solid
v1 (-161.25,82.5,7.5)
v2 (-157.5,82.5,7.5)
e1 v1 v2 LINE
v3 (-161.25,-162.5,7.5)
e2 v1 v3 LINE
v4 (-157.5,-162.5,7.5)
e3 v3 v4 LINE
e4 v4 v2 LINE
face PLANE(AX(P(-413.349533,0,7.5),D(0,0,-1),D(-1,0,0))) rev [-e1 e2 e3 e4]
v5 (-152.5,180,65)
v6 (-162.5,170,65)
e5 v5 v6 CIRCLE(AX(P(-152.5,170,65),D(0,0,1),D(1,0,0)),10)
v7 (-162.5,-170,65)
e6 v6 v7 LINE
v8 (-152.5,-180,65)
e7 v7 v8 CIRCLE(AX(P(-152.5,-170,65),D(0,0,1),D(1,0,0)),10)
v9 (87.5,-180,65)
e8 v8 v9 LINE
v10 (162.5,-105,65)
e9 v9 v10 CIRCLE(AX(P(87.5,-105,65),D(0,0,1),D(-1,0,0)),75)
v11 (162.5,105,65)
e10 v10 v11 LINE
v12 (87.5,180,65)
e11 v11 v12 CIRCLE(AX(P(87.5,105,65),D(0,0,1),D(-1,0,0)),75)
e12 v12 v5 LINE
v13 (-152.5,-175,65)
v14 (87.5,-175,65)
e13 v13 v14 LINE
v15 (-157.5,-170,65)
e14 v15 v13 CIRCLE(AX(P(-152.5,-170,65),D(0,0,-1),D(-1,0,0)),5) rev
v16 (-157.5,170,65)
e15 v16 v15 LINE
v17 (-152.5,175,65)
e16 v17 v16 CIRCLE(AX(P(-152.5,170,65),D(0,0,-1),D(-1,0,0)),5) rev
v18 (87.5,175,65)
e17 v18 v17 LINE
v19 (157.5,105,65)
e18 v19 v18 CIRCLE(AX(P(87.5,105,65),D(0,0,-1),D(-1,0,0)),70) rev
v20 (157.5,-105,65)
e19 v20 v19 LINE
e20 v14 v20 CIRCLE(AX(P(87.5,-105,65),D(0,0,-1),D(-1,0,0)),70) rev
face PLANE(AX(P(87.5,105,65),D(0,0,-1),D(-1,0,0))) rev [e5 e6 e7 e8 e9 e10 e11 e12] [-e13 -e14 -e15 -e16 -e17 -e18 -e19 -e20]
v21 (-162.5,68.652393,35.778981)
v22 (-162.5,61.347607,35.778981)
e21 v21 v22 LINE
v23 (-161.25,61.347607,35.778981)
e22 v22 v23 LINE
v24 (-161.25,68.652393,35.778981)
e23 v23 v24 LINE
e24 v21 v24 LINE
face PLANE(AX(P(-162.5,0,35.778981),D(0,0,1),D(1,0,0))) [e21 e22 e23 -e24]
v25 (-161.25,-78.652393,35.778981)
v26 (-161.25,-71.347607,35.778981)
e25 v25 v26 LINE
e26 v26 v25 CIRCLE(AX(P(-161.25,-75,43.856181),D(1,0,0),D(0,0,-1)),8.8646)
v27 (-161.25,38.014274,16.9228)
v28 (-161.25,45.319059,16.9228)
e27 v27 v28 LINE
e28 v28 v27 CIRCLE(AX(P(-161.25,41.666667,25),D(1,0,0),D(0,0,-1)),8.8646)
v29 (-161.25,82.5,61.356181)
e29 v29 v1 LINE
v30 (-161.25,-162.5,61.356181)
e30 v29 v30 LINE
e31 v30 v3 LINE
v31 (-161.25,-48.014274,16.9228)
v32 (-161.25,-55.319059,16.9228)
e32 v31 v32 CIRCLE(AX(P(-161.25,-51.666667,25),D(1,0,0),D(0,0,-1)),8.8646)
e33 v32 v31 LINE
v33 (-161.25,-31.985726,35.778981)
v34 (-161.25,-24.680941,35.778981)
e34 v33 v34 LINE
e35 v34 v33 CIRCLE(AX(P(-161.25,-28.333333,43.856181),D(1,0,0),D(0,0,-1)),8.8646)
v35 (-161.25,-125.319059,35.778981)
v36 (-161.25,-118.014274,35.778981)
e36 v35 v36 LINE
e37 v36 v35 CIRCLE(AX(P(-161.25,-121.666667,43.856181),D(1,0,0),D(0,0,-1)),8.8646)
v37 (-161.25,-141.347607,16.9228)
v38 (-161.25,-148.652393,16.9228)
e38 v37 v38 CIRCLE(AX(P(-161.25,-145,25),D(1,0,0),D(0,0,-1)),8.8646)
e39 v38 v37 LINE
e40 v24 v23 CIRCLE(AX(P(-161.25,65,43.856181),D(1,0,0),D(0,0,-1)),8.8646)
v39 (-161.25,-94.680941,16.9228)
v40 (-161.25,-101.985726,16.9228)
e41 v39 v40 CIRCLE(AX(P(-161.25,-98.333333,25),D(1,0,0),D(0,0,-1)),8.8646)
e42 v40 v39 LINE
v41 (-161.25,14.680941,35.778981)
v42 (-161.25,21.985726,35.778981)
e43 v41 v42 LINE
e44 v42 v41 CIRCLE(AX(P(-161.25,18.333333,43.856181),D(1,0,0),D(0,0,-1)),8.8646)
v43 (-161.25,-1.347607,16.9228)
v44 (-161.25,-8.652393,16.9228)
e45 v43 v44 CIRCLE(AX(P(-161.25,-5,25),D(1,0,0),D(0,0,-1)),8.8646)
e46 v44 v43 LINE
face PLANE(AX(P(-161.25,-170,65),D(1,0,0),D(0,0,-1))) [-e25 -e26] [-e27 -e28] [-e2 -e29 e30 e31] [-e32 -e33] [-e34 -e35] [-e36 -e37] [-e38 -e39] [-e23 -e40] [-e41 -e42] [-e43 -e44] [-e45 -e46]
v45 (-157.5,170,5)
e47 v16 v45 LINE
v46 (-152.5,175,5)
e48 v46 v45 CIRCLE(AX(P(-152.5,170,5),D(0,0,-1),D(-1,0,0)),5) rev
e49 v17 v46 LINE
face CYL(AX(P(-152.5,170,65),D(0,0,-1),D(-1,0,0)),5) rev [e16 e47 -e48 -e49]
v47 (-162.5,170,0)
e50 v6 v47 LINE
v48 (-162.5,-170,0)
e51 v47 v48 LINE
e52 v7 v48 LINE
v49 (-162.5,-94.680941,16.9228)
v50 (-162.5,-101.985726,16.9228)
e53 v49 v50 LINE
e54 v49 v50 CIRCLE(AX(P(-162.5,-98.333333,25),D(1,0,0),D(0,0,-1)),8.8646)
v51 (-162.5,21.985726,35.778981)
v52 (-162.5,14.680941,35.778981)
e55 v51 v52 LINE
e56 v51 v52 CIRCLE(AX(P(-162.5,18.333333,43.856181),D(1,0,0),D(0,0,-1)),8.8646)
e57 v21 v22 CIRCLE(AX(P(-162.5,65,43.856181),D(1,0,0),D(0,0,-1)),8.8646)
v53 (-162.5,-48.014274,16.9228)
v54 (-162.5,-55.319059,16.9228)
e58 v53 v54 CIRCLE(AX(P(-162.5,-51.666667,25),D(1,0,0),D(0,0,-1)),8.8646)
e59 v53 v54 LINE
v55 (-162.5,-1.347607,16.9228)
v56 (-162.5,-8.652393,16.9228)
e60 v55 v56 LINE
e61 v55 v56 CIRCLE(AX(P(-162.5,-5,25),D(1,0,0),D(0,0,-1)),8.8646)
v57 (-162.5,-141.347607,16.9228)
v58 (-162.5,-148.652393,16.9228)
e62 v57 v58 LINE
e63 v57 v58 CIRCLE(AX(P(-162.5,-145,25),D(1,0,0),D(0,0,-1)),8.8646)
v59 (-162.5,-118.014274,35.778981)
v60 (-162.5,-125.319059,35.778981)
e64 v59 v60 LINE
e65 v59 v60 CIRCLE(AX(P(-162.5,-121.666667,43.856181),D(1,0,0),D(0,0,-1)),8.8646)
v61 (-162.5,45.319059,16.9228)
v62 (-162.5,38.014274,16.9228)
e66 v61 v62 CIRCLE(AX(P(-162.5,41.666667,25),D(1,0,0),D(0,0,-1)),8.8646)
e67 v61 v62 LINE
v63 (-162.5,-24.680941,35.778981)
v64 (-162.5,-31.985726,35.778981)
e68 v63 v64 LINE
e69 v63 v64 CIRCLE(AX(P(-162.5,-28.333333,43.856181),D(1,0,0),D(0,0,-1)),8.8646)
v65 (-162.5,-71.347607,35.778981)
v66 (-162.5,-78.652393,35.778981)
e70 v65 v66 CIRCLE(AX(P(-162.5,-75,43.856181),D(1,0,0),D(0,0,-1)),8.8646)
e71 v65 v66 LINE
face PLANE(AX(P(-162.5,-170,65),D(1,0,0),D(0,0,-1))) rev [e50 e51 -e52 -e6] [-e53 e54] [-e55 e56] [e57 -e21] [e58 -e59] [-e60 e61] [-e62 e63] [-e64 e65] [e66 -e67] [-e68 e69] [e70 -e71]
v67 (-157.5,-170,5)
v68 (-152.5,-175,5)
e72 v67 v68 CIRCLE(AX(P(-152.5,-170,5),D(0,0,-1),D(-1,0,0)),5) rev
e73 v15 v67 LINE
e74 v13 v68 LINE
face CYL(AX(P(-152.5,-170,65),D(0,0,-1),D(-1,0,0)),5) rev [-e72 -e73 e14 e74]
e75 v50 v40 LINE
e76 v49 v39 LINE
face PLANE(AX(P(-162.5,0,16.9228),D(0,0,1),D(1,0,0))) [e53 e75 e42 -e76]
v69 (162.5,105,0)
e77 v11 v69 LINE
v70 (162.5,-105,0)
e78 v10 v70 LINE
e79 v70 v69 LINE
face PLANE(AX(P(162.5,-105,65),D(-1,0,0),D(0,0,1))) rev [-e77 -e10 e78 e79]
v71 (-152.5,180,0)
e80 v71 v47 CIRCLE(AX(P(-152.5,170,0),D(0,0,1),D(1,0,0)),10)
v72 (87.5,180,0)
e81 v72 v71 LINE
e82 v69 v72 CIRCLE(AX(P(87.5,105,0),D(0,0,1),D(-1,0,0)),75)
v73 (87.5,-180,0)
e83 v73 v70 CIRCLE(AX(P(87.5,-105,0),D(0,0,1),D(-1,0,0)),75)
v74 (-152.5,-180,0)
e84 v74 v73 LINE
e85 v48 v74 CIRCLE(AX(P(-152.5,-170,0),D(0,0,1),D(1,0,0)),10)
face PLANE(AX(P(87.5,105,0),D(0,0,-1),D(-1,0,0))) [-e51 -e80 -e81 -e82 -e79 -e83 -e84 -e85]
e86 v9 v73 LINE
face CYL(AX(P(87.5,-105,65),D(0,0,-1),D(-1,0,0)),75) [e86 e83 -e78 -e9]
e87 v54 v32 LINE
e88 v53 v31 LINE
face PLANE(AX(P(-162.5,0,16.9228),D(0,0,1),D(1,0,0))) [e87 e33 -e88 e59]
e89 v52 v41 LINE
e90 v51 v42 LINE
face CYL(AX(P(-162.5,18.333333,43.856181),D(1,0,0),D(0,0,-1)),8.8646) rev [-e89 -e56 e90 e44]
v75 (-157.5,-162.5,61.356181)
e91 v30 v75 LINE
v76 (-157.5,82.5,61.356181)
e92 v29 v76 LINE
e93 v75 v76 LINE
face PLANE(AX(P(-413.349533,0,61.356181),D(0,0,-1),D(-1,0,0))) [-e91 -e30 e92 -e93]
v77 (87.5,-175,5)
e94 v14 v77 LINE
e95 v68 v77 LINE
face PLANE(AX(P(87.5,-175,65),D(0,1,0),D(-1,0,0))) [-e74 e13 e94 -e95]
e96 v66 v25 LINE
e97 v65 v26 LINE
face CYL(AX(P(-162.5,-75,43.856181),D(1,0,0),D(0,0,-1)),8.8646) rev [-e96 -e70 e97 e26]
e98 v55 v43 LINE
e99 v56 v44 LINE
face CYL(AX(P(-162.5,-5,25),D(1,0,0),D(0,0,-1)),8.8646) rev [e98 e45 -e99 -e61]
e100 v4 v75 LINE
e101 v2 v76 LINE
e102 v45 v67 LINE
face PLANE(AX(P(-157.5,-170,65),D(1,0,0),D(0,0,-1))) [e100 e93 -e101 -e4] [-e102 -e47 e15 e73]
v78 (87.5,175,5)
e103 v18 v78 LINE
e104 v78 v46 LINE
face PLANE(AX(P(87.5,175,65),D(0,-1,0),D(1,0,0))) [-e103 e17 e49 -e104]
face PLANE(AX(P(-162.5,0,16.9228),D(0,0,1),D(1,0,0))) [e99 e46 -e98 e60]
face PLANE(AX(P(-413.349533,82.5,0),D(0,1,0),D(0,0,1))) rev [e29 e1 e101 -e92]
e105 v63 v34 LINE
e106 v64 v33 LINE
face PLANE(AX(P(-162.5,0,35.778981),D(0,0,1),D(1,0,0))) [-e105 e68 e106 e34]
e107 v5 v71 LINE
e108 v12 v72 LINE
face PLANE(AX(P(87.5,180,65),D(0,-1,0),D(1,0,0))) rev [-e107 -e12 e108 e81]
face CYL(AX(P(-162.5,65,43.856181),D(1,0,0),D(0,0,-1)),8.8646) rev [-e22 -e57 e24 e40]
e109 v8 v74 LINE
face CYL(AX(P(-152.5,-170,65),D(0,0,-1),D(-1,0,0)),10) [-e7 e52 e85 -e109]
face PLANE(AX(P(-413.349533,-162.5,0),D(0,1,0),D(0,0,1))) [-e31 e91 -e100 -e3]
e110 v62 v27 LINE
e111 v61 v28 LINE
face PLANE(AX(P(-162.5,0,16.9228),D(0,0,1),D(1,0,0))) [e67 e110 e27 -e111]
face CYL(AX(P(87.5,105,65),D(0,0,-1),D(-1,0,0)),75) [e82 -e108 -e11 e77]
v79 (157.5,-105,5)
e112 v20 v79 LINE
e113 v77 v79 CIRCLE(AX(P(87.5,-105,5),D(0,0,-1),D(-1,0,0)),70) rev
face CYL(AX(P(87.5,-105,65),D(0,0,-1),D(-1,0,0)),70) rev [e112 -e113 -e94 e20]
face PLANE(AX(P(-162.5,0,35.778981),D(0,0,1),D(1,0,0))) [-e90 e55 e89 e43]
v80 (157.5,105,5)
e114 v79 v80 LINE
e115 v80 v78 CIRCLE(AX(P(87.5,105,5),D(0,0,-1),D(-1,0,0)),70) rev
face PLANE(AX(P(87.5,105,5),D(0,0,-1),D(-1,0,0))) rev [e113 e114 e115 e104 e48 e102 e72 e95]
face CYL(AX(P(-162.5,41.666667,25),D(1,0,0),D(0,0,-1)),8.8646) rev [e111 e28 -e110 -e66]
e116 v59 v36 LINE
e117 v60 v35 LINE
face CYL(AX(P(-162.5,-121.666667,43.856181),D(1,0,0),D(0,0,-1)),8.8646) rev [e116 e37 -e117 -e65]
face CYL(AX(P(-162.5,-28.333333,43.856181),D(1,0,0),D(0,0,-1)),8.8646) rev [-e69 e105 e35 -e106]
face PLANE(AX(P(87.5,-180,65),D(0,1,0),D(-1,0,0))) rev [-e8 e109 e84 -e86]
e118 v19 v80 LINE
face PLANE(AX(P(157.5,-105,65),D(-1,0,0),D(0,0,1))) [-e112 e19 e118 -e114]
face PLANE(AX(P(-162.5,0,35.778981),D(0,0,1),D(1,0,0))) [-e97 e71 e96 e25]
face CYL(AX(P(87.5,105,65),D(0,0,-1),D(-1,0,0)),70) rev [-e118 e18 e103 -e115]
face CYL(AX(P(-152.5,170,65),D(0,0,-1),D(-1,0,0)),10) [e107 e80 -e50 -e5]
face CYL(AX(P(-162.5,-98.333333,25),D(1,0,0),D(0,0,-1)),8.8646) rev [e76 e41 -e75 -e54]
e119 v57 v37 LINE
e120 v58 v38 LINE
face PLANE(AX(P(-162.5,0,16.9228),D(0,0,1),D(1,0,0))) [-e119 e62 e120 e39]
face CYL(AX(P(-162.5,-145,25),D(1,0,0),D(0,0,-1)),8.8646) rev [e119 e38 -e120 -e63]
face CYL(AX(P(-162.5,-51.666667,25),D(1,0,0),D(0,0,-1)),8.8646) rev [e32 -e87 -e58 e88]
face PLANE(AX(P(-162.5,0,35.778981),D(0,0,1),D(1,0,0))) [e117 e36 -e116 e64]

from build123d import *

# Parameters (mm, degrees)
BOSS_EXTRUDE1_DEPTH = 65
SHELL1_T            = -5
CUT_EXTRUDE1_DEPTH  = 373.86056375
SKETCH4_W           = 245
SKETCH4_H           = 53.856180832
CUT_EXTRUDE2_DEPTH  = 3.75


# Read off the part's stored shape, not the designer's step: Boss-Extrude1
with BuildPart() as part:
    # Boss-Extrude1 outline → Boss-Extrude1 (new body)
    with BuildSketch(Plane(origin=(0, 0, 0), x_dir=(0, 1, 0), z_dir=(0, 0, 1))):
        with BuildLine():
            ThreePointArc((105, -162.5), (158.033008589, -140.533008589), (180, -87.5))
            Line((180, -87.5), (180, 152.5))
            ThreePointArc((180, 152.5), (177.071067812, 159.571067812), (170, 162.5))
            Line((170, 162.5), (-170, 162.5))
            ThreePointArc((-170, 162.5), (-177.071067812, 159.571067812), (-180, 152.5))
            Line((-180, 152.5), (-180, -87.5))
            ThreePointArc((-180, -87.5), (-158.033008589, -140.533008589), (-105, -162.5))
            Line((-105, -162.5), (105, -162.5))
        make_face()
    extrude(amount=BOSS_EXTRUDE1_DEPTH)

    # Shell1
    shell1_openings = [part.faces().sort_by_distance(p)[0] for p in [
        (-3.011930619, 0, 65),
    ]]
    offset(amount=SHELL1_T, openings=shell1_openings, kind=Kind.INTERSECTION)

    # Sketch3 → Cut-Extrude1 (cut, through all)
    with BuildSketch(Plane.YZ.offset(-157.5)):
        with BuildLine():
            Line((-148.652392821, 16.9228), (-141.347607179, 16.9228))
            ThreePointArc((-141.347607179, 16.9228), (-145, 33.8646), (-148.652392821, 16.9228))
        make_face()
        with BuildLine():
            Line((-125.319059488, 35.778980832), (-118.014273846, 35.778980832))
            ThreePointArc((-118.014273846, 35.778980832), (-121.666666667, 52.720780832), (-125.319059488, 35.778980832))
        make_face()
        with BuildLine():
            Line((-78.652392821, 35.778980832), (-71.347607179, 35.778980832))
            ThreePointArc((-71.347607179, 35.778980832), (-75, 52.720780832), (-78.652392821, 35.778980832))
        make_face()
        with BuildLine():
            Line((-101.985726154, 16.9228), (-94.680940512, 16.9228))
            ThreePointArc((-94.680940512, 16.9228), (-98.333333333, 33.8646), (-101.985726154, 16.9228))
        make_face()
        with BuildLine():
            Line((-31.985726154, 35.778980832), (-24.680940512, 35.778980832))
            ThreePointArc((-24.680940512, 35.778980832), (-28.333333333, 52.720780832), (-31.985726154, 35.778980832))
        make_face()
        with BuildLine():
            Line((-55.319059488, 16.9228), (-48.014273846, 16.9228))
            ThreePointArc((-48.014273846, 16.9228), (-51.666666667, 33.8646), (-55.319059488, 16.9228))
        make_face()
        with BuildLine():
            Line((14.680940512, 35.778980832), (21.985726154, 35.778980832))
            ThreePointArc((21.985726154, 35.778980832), (18.333333333, 52.720780832), (14.680940512, 35.778980832))
        make_face()
        with BuildLine():
            Line((-8.652392821, 16.9228), (-1.347607179, 16.9228))
            ThreePointArc((-1.347607179, 16.9228), (-5, 33.8646), (-8.652392821, 16.9228))
        make_face()
        with BuildLine():
            Line((61.347607179, 35.778980832), (68.652392821, 35.778980832))
            ThreePointArc((68.652392821, 35.778980832), (65, 52.720780832), (61.347607179, 35.778980832))
        make_face()
        with BuildLine():
            Line((38.014273846, 16.9228), (45.319059488, 16.9228))
            ThreePointArc((45.319059488, 16.9228), (41.666666667, 33.8646), (38.014273846, 16.9228))
        make_face()
    extrude(amount=-CUT_EXTRUDE1_DEPTH, mode=Mode.SUBTRACT)

    # Sketch4 → Cut-Extrude2 (cut)
    with BuildSketch(Plane.YZ.offset(-157.5)):
        with Locations((-40, 34.428090416)):
            Rectangle(SKETCH4_W, SKETCH4_H)
    extrude(amount=-CUT_EXTRUDE2_DEPTH, mode=Mode.SUBTRACT)


solid = part.part
